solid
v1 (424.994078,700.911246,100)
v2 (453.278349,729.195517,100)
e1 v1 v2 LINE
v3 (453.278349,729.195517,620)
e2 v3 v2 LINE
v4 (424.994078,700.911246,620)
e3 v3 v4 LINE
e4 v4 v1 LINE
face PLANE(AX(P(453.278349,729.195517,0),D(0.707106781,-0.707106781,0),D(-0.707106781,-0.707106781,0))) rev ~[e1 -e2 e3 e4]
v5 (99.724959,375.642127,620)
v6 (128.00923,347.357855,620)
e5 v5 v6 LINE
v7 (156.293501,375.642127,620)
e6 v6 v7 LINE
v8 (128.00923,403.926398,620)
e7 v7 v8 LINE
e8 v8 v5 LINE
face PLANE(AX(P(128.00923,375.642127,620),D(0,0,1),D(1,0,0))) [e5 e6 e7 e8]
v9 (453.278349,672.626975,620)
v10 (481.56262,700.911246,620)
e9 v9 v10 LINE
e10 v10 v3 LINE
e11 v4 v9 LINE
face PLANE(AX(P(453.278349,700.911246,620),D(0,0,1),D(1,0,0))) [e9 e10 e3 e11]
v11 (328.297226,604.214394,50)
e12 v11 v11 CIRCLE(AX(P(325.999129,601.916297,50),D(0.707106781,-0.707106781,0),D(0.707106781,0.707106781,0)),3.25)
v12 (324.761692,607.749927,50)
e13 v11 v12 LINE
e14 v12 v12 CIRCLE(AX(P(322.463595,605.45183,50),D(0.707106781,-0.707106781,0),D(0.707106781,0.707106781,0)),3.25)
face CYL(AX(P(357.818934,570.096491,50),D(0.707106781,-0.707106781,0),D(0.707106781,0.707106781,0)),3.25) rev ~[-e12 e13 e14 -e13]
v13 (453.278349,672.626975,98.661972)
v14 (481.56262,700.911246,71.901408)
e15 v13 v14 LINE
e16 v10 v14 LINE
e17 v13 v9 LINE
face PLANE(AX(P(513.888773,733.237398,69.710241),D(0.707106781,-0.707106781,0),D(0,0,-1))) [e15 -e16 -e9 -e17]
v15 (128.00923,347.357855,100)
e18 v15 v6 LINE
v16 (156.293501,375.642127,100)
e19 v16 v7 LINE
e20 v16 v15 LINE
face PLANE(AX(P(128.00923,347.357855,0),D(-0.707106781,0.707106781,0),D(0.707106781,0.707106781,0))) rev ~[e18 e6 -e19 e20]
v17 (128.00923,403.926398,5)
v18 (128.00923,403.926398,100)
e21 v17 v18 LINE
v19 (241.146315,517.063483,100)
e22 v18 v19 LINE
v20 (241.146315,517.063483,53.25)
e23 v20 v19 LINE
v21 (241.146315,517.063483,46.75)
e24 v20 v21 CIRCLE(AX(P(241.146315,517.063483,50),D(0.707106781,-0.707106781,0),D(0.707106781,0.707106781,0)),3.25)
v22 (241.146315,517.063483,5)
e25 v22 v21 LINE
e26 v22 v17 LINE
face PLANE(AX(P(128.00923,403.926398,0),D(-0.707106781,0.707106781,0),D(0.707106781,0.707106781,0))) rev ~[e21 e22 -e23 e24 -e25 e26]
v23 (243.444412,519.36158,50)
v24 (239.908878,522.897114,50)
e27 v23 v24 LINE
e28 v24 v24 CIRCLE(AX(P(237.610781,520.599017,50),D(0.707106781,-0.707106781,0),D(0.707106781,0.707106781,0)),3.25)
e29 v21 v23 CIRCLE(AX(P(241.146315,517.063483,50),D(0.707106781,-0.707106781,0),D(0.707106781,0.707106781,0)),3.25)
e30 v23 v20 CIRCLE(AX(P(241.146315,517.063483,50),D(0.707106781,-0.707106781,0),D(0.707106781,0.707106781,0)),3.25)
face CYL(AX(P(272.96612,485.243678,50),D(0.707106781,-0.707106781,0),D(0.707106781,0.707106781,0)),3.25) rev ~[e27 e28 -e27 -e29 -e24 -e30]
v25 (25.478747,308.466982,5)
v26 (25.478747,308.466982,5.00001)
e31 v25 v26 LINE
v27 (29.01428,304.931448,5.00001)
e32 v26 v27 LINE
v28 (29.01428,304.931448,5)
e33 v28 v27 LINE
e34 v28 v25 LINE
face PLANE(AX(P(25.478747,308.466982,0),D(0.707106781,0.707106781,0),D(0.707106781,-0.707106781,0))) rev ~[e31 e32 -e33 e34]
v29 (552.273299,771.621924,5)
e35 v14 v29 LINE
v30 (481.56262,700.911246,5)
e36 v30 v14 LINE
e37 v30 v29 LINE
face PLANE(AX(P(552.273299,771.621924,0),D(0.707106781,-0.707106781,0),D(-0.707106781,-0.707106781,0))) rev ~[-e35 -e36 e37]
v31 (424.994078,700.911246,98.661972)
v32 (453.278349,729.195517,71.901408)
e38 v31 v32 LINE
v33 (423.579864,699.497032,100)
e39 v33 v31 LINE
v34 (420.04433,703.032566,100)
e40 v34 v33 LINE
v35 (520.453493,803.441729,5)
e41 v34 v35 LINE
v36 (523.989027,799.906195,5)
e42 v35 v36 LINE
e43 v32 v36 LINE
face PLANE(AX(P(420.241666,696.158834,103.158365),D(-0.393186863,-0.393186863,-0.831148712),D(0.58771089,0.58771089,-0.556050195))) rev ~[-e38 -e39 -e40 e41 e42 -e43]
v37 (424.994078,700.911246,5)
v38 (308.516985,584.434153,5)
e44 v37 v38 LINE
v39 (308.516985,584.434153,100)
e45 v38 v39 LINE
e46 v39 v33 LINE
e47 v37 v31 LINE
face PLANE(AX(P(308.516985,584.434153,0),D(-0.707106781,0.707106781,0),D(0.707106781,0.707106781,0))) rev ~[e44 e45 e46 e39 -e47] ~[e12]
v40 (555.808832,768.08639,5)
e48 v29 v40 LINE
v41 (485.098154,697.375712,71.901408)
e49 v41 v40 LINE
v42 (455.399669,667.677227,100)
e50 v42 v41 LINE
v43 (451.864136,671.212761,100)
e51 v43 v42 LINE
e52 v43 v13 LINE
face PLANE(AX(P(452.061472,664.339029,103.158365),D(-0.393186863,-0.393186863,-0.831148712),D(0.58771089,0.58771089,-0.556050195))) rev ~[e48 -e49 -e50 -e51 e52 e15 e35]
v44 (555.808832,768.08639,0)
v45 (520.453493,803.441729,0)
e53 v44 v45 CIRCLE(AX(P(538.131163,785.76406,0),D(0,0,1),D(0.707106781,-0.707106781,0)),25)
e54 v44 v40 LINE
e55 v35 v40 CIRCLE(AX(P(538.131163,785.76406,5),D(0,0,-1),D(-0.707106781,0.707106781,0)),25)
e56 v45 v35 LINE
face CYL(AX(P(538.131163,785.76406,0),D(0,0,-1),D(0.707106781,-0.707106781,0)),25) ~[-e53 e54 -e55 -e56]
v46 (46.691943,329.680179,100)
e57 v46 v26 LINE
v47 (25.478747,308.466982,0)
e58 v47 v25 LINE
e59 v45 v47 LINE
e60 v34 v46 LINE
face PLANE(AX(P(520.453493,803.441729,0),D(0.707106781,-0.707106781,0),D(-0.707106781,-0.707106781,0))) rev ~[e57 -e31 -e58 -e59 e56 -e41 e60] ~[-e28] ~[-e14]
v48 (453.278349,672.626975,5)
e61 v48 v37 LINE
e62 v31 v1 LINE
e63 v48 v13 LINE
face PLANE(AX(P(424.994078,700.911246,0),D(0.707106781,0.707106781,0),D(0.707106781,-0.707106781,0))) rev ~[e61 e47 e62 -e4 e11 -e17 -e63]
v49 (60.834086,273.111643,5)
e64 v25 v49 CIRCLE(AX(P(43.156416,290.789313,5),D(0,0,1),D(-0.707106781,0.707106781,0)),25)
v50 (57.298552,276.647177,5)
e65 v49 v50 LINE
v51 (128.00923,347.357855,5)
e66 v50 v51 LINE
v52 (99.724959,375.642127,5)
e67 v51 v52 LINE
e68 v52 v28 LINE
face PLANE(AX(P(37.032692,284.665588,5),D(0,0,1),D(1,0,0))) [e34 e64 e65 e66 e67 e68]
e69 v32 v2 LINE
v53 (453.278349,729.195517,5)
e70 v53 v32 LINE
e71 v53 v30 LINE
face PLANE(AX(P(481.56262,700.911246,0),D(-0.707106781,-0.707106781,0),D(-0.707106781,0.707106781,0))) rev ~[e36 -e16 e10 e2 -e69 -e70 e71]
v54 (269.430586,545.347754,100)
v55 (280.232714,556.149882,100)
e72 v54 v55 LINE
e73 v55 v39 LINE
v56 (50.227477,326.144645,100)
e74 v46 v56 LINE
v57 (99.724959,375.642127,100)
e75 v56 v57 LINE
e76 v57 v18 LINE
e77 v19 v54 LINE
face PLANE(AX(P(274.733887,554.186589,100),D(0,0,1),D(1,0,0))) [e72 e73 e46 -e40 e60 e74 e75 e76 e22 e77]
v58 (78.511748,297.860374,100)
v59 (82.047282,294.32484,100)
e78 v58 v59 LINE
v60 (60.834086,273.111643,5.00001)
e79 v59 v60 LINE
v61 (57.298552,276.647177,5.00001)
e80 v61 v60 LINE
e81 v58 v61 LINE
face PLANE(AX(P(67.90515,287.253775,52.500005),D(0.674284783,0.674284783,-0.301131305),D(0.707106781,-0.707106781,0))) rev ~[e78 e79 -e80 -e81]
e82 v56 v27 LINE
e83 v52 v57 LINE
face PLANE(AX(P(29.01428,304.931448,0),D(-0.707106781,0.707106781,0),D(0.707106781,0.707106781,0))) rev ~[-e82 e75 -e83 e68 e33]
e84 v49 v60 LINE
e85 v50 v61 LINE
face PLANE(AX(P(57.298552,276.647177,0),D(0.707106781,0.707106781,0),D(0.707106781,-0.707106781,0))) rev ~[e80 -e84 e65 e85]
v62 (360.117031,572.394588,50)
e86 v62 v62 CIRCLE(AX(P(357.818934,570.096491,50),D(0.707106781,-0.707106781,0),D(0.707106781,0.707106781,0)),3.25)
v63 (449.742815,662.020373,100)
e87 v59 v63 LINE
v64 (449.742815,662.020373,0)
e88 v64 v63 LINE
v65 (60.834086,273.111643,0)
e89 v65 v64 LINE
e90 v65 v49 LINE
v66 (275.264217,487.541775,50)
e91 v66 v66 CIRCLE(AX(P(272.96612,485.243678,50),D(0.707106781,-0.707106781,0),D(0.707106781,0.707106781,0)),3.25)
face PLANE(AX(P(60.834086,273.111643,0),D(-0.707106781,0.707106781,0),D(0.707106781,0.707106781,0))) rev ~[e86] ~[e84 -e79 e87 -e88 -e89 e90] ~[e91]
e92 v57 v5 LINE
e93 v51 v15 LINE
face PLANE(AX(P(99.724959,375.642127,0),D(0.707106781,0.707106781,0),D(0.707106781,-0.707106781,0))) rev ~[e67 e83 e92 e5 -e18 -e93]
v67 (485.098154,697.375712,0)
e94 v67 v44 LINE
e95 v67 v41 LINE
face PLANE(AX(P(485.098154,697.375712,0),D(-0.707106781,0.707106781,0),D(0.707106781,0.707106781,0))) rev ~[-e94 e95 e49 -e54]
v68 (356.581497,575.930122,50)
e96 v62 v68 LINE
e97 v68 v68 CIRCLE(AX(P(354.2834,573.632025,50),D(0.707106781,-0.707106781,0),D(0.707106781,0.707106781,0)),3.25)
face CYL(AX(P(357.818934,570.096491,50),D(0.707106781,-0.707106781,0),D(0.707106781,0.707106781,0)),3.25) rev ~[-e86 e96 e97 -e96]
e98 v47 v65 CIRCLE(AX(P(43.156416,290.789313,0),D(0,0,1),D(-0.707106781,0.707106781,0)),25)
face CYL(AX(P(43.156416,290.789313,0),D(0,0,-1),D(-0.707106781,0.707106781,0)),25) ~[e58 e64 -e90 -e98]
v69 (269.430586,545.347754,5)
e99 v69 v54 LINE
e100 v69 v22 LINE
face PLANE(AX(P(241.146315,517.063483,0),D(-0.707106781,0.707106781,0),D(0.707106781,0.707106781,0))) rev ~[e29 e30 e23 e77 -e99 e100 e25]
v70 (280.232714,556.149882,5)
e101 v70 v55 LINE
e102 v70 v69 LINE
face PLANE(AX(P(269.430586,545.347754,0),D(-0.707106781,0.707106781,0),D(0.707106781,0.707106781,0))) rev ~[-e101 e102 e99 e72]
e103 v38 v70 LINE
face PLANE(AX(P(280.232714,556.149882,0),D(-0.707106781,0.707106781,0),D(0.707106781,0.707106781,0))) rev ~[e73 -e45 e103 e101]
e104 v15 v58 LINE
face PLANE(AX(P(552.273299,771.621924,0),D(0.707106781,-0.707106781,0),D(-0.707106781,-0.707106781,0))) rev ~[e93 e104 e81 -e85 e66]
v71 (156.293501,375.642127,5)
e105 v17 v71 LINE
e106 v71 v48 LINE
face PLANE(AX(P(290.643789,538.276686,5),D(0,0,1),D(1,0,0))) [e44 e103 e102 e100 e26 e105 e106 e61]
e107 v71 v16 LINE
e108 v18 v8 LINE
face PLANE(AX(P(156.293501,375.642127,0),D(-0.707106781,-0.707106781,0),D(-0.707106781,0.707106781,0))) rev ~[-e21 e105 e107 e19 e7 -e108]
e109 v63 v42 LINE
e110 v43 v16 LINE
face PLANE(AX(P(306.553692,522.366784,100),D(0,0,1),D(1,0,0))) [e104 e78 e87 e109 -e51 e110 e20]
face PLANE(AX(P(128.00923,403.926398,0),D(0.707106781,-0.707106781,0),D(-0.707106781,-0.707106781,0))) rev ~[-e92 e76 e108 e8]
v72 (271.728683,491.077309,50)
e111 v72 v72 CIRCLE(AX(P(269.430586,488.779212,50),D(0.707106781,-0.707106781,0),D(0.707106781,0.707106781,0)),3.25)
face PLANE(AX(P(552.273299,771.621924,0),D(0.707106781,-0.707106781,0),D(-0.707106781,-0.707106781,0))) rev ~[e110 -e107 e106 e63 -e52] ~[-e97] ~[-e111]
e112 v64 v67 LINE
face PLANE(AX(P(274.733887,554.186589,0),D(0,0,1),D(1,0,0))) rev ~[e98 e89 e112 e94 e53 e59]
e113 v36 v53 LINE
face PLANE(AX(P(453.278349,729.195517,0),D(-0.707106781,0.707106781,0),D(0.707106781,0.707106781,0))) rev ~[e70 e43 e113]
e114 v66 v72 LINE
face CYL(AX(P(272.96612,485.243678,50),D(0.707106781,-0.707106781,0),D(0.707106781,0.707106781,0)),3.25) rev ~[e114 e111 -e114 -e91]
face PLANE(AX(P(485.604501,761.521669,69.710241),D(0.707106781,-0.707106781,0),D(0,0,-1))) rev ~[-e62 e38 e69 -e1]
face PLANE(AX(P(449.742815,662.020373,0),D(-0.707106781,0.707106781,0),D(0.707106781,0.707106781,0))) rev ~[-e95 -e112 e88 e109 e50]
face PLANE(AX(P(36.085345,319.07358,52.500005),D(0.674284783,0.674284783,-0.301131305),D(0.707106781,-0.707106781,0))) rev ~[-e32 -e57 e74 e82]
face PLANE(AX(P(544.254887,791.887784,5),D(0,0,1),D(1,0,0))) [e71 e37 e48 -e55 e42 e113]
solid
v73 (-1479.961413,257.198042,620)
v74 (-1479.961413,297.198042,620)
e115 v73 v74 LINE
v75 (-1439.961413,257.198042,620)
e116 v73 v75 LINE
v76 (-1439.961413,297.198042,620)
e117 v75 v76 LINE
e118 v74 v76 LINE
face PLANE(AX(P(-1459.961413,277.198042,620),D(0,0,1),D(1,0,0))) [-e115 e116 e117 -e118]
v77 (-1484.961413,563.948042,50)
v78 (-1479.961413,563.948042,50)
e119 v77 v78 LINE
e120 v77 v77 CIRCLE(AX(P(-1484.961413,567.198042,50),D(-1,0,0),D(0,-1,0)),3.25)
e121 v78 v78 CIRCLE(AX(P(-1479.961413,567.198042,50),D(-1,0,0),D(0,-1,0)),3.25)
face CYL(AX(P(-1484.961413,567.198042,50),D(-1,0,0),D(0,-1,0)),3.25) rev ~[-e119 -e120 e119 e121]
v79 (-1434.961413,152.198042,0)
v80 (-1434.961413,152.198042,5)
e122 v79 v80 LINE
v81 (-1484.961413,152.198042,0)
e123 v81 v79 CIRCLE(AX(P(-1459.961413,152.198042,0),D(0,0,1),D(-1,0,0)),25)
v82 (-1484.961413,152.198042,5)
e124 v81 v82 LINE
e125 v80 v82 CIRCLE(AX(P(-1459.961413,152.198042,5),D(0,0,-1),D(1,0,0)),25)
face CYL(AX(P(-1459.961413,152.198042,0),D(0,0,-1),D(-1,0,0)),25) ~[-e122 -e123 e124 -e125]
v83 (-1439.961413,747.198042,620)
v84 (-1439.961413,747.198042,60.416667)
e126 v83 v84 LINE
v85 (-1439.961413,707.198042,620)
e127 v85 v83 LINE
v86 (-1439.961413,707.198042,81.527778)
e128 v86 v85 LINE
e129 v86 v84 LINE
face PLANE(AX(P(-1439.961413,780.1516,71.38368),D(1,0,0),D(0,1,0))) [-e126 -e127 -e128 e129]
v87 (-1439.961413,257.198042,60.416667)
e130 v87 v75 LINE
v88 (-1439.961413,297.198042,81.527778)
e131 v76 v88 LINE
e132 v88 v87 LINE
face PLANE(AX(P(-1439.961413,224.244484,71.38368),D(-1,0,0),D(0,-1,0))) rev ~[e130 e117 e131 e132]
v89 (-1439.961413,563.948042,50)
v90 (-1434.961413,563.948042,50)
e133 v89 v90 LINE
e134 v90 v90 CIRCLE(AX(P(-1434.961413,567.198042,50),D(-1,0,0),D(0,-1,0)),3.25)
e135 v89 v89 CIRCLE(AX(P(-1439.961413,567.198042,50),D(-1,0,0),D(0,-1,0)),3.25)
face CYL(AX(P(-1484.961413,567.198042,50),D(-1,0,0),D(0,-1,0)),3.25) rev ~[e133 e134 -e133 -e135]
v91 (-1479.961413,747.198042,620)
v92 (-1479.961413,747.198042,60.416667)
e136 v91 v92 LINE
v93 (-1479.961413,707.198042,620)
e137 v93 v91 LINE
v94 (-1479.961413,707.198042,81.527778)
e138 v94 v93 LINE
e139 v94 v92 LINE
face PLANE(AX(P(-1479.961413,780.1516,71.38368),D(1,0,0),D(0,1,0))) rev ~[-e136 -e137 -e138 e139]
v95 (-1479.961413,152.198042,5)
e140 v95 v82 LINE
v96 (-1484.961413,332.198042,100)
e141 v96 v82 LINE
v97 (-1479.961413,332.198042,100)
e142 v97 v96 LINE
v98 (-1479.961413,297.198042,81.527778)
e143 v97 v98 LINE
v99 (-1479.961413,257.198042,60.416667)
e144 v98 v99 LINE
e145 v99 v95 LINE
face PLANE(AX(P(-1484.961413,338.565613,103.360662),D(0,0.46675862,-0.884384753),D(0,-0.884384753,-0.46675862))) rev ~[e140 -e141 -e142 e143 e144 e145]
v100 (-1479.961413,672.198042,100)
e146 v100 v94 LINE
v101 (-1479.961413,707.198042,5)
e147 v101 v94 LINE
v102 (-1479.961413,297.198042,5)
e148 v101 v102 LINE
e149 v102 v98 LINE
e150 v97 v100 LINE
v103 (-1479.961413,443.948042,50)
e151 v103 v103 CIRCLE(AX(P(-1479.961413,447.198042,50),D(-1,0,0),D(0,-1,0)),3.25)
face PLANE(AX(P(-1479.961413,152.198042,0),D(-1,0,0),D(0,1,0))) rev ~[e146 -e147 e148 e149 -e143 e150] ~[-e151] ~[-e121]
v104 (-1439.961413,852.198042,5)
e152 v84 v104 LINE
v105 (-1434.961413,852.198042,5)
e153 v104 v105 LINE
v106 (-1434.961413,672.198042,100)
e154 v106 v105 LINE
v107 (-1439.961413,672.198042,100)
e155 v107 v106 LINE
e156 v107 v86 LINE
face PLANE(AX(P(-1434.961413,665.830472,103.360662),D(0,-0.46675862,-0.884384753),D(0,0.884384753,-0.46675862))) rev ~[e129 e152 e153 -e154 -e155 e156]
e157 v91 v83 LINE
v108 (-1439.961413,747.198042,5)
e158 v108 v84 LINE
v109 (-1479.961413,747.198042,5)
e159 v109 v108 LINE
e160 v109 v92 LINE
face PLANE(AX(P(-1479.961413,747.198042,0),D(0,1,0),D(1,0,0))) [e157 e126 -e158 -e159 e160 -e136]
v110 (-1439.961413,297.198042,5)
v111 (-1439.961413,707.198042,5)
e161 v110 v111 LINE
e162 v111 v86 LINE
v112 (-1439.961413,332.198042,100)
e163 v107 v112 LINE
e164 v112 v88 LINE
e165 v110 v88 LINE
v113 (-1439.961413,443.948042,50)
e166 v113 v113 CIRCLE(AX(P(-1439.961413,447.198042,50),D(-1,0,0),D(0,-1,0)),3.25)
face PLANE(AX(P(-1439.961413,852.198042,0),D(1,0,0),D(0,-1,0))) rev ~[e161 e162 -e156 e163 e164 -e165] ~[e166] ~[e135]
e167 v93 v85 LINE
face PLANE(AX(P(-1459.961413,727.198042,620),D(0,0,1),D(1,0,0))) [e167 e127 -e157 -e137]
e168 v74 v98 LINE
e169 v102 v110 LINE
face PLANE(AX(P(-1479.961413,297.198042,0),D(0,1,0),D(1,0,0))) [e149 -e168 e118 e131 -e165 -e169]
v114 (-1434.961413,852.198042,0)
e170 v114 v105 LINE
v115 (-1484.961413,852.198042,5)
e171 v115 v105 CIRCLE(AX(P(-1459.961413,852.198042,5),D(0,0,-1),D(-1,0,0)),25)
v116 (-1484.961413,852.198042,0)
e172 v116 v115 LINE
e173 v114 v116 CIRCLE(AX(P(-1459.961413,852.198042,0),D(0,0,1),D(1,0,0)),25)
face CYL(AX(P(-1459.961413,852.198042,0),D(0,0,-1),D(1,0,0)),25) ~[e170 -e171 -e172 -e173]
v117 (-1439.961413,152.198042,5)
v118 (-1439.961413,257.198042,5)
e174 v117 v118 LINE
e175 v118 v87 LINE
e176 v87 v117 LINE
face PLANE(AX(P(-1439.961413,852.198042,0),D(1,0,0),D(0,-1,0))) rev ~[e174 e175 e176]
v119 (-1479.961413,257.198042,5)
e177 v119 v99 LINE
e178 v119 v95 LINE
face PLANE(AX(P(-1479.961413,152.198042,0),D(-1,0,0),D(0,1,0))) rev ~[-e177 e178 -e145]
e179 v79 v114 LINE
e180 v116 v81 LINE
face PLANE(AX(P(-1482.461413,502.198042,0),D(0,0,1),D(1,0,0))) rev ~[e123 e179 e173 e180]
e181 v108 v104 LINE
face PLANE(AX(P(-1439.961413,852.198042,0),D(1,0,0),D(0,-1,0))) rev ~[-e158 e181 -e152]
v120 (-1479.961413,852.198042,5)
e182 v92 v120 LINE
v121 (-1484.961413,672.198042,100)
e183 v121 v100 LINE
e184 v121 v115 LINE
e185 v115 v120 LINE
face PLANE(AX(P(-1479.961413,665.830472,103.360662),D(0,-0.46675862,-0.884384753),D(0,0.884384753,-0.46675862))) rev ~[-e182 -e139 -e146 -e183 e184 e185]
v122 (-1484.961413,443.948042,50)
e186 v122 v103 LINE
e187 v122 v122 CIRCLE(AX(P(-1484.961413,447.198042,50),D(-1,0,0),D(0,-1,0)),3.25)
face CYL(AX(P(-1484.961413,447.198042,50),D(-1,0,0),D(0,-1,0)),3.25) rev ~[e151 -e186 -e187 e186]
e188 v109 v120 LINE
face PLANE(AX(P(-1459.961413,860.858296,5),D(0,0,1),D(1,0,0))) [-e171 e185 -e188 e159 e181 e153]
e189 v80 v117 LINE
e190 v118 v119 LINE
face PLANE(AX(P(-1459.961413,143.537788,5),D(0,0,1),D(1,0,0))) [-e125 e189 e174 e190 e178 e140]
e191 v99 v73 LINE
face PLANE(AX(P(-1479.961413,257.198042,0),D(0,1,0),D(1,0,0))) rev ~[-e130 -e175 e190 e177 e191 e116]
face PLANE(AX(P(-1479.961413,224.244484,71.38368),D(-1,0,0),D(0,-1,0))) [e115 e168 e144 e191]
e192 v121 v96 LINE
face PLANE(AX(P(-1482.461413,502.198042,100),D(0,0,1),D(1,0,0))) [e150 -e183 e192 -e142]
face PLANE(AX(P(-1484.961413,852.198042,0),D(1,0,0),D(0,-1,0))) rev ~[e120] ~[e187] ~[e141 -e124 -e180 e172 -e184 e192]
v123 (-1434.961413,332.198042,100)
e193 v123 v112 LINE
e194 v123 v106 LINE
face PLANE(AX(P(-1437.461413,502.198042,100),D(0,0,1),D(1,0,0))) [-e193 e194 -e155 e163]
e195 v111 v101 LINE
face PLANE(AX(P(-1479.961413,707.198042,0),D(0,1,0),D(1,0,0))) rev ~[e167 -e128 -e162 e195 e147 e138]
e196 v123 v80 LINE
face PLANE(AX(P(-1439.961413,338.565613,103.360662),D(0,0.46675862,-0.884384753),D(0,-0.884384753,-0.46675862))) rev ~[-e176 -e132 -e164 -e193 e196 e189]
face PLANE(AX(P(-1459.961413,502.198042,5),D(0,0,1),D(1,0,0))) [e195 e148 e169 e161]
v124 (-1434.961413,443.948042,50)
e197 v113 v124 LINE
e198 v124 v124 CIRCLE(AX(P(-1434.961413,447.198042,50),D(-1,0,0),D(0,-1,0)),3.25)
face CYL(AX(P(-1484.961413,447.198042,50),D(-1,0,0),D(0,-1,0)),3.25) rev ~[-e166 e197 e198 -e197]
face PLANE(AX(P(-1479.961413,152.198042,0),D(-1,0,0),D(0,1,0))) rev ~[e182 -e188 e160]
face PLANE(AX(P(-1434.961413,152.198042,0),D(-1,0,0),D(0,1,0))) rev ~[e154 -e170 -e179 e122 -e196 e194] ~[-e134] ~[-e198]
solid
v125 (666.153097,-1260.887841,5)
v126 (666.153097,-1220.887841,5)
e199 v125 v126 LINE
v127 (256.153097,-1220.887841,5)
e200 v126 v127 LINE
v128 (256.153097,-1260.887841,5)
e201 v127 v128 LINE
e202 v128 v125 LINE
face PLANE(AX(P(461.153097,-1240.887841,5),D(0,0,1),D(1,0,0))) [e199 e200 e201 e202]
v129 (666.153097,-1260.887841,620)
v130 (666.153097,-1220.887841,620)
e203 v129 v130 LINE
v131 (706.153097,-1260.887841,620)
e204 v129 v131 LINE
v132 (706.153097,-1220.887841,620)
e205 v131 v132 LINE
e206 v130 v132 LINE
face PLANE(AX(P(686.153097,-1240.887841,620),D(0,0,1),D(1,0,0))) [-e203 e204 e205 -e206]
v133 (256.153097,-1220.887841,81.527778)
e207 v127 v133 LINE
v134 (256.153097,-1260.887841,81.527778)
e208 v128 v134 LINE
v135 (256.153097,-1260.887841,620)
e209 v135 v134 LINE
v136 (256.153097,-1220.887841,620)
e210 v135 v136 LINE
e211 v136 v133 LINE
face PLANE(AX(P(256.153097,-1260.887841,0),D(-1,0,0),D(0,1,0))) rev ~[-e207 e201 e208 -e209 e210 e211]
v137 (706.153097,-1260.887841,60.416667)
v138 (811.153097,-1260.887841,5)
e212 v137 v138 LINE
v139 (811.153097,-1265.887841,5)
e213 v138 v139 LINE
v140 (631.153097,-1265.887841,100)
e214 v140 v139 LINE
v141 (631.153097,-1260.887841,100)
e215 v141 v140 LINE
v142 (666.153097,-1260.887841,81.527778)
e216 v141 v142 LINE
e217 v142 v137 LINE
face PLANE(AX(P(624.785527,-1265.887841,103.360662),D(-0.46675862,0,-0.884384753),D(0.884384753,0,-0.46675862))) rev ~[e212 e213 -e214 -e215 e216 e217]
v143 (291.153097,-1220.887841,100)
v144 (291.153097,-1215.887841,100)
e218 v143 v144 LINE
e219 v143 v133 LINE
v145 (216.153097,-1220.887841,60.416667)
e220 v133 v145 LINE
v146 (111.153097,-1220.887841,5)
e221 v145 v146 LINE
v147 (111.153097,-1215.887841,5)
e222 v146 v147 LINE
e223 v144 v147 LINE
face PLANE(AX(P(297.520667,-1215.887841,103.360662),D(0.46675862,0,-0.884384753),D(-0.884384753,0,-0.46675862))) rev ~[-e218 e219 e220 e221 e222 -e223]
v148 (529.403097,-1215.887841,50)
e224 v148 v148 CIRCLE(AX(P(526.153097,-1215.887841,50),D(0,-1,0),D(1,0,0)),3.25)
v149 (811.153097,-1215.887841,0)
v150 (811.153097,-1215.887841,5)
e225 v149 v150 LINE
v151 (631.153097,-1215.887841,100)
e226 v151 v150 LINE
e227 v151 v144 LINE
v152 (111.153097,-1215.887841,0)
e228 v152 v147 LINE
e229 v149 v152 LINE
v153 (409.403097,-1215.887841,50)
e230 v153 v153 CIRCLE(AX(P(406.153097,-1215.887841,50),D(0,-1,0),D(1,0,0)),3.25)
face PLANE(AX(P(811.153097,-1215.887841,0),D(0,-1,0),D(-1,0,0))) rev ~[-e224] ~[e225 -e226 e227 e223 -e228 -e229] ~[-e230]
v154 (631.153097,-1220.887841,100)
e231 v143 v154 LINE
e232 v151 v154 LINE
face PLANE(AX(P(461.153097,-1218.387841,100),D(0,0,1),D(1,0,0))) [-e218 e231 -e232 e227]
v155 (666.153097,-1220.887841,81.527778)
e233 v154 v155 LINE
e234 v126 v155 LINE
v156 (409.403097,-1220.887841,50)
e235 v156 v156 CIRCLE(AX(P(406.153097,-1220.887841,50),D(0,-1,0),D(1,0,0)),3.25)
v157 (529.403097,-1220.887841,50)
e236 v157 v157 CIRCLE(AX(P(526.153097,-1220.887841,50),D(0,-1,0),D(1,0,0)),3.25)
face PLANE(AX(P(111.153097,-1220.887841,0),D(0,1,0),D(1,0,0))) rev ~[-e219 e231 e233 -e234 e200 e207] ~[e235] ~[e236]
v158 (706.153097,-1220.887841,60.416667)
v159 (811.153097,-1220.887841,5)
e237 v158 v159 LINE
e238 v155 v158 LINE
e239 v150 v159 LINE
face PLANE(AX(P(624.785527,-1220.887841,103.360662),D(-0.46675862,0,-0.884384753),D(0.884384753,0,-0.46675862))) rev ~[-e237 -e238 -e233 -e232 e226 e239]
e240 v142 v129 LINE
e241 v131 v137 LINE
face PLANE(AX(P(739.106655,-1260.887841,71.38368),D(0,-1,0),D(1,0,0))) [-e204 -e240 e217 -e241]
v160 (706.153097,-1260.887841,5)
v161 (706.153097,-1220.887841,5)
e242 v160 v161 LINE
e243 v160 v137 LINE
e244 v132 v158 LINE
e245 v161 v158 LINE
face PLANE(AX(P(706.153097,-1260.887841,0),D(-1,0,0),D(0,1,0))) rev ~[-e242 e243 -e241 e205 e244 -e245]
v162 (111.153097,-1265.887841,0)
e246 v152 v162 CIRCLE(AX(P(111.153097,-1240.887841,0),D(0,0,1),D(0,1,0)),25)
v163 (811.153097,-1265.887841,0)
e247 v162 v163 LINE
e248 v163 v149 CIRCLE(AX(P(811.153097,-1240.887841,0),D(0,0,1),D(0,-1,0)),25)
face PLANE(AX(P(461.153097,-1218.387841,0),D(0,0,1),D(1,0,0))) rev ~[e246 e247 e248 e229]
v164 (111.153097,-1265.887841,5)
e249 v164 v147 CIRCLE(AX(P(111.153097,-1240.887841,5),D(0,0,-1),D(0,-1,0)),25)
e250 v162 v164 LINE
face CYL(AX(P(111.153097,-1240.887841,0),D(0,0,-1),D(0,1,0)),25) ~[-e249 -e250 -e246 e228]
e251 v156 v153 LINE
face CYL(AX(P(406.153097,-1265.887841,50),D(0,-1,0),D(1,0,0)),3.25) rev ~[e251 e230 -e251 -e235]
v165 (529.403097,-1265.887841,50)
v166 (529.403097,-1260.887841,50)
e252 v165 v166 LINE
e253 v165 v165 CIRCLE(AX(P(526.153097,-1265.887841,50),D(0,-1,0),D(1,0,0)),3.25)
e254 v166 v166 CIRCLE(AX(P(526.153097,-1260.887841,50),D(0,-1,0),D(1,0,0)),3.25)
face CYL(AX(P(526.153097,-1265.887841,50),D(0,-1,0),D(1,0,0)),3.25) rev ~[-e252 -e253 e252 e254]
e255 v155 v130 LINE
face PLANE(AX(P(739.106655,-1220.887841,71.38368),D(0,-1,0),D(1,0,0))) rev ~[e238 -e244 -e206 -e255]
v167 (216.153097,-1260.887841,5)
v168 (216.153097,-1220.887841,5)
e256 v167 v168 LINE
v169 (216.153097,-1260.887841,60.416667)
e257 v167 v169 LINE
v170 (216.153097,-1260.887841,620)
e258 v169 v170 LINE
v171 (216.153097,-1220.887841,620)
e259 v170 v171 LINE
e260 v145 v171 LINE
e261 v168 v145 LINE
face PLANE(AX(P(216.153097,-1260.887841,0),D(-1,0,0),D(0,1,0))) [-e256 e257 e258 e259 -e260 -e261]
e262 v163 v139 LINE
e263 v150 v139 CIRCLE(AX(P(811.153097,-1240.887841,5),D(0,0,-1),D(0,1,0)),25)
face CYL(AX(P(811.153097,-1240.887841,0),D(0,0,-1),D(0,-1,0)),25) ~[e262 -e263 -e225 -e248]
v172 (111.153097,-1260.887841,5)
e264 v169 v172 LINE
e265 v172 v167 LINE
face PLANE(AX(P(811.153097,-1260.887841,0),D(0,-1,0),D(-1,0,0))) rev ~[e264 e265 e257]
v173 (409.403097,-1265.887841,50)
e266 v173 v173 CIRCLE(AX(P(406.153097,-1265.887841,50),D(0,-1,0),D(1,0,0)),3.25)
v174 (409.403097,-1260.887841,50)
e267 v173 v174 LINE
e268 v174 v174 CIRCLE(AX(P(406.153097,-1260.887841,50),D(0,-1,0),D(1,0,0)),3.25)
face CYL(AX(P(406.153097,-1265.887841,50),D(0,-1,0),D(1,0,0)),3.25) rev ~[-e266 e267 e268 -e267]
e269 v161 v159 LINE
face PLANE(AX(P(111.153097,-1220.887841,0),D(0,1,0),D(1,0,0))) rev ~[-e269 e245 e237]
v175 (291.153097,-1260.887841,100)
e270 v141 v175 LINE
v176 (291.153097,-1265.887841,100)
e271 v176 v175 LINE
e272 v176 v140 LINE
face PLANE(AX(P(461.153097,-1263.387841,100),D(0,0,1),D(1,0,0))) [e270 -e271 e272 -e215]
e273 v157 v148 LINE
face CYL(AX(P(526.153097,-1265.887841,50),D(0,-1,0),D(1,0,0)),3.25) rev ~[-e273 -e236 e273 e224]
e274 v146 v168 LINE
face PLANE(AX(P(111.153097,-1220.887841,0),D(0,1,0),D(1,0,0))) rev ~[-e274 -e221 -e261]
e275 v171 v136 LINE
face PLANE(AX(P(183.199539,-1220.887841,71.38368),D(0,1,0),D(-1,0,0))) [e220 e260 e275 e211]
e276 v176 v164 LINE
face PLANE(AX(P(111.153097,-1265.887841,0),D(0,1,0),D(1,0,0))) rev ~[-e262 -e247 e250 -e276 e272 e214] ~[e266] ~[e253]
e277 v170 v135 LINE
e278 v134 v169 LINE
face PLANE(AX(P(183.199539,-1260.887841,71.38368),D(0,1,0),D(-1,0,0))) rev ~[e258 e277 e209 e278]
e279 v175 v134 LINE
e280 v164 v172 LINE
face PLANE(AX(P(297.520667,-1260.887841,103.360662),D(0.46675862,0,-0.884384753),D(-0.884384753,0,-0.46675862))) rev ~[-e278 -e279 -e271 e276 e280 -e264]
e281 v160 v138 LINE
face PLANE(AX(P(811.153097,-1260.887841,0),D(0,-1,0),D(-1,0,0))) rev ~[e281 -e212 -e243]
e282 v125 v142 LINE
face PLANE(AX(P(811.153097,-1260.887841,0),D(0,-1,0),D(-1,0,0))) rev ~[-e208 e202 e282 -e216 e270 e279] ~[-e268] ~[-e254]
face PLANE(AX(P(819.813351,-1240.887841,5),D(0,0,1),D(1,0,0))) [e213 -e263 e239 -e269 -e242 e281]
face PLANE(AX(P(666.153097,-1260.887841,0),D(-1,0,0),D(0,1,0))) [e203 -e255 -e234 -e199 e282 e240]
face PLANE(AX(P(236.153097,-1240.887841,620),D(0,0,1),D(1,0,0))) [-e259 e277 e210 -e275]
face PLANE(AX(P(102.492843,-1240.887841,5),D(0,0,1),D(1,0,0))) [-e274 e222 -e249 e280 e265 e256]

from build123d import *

# Parameters (mm, degrees)
F0_W           = 105
F0_H           = 40
F1_DEPTH       = 5
F0_W_2         = 40
F0_H_2         = 105
F2_DEPTH       = 620
F3_DEPTH       = 100
F4_T4_DEPTH    = 5
F4_T9_DEPTH    = 5
F4_T14_DEPTH   = 5
F4_T19_DEPTH   = 5
F4_2_T4_DEPTH  = 5
F4_2_T9_DEPTH  = 5
F4_2_T14_DEPTH = 5
F4_2_T19_DEPTH = 5
F6_T4_DEPTH    = 5
F6_T9_DEPTH    = 5
F7_SIZE2       = 94.99999
F7_SIZE        = 29.99999
F7_2_SIZE2     = 94.99999
F7_2_SIZE      = 29.99999
F10_R          = 3.25
F11_DEPTH      = 60
F12_R          = 3.25
F13_DEPTH      = 60
F14_R          = 3.25
F15_DEPTH      = 60


# Not quite as in the source:
# - a fillet or chamfer that OpenCascade refuses, or shapes differently, is made with other operations: its cross-section is extruded or revolved along the edge and cut away or added
# - two fillets or chamfers of one size are made in one step
# - a fillet or chamfer is up to 0.001 mm smaller than in the source, because OpenCascade refuses the exact size
# - a feature names something its author has since deleted; it is built from what else it names


with BuildPart() as f1:
    # F0 (on Top) → F1 (new body)
    with BuildSketch(Plane.XY):
        with BuildLine():
            ThreePointArc((811.153096903, -1265.8878414162), (836.153096903, -1240.8878414162), (811.153096903, -1215.8878414162))
            Line((811.153096903, -1215.8878414162), (811.153096903, -1220.8878414162))
            Line((811.153096903, -1220.8878414162), (811.153096903, -1260.8878414162))
            Line((811.153096903, -1260.8878414162), (811.153096903, -1265.8878414162))
        make_face()
        with Locations((758.653096903, -1240.8878414162)):
            Rectangle(F0_W, F0_H)
    extrude(amount=F1_DEPTH)



with BuildPart() as f1b:
    # F0 (on Top) → F1, piece 2 (new body)
    with BuildSketch(Plane.XY):
        with BuildLine():
            Line((111.153096903, -1220.8878414162), (111.153096903, -1215.8878414162))
            ThreePointArc((111.153096903, -1215.8878414162), (86.153096903, -1240.8878414162), (111.153096903, -1265.8878414162))
            Line((111.153096903, -1265.8878414162), (111.153096903, -1260.8878414162))
            Line((111.153096903, -1260.8878414162), (111.153096903, -1220.8878414162))
        make_face()
        with Locations((163.653096903, -1240.8878414162)):
            Rectangle(F0_W, F0_H)
    extrude(amount=F1_DEPTH)


with BuildPart() as f1c:
    # F0 (on Top) → F1, piece 3 (new body)
    with BuildSketch(Plane.XY):
        with BuildLine():
            Line((29.0142804433, 304.9314484107), (25.4787465374, 308.4669823167))
            ThreePointArc((25.4787465374, 308.4669823167), (25.4787465374, 273.1116432573), (60.8340855967, 273.1116432573))
            Line((60.8340855967, 273.1116432573), (57.2985516908, 276.6471771633))
            Line((57.2985516908, 276.6471771633), (29.0142804433, 304.9314484107))
        make_face()
        Polygon((99.724958562, 375.6421265294), (29.0142804433, 304.9314484107), (57.2985516908, 276.6471771633), (128.0092298094, 347.3578552819), align=None)
    extrude(amount=F1_DEPTH)



with BuildPart() as f1d:
    # F0 (on Top) → F1, piece 4 (new body)
    with BuildSketch(Plane.XY):
        with BuildLine():
            ThreePointArc((555.8088324273, 768.0863900879), (555.8088324273, 803.4417291473), (520.453493368, 803.4417291473))
            Line((520.453493368, 803.4417291473), (523.9890272739, 799.9061952413))
            Line((523.9890272739, 799.9061952413), (552.2732985214, 771.6219239939))
            Line((552.2732985214, 771.6219239939), (555.8088324273, 768.0863900879))
        make_face()
        Polygon((552.2732985214, 771.6219239939), (523.9890272739, 799.9061952413), (453.2783491552, 729.1955171227), (481.5626204027, 700.9112458752), align=None)
    extrude(amount=F1_DEPTH)


with BuildPart() as f1e:
    # F0 (on Top) → F1, piece 5 (new body)
    with BuildSketch(Plane.XY):
        with BuildLine():
            Line((-1479.9614127988, 152.1980424396), (-1484.9614127988, 152.1980424396))
            ThreePointArc((-1484.9614127988, 152.1980424396), (-1459.9614127988, 127.1980424396), (-1434.9614127988, 152.1980424396))
            Line((-1434.9614127988, 152.1980424396), (-1439.9614127988, 152.1980424396))
            Line((-1439.9614127988, 152.1980424396), (-1479.9614127988, 152.1980424396))
        make_face()
        Polygon((-1479.9614127988, 202.1980424396), (-1479.9614127988, 152.1980424396), (-1439.9614127988, 152.1980424396), (-1439.9614127988, 202.1980424396), (-1439.9614127988, 242.1980424396), (-1439.9614127988, 257.1980424396), (-1479.9614127988, 257.1980424396), (-1479.9614127988, 242.1980424396), align=None)
    extrude(amount=F1_DEPTH)



with BuildPart() as f1f:
    # F0 (on Top) → F1, piece 6 (new body)
    with BuildSketch(Plane.XY):
        with BuildLine():
            ThreePointArc((-1434.9614127988, 852.1980424396), (-1459.9614127988, 877.1980424396), (-1484.9614127988, 852.1980424396))
            Line((-1484.9614127988, 852.1980424396), (-1479.9614127988, 852.1980424396))
            Line((-1479.9614127988, 852.1980424396), (-1439.9614127988, 852.1980424396))
            Line((-1439.9614127988, 852.1980424396), (-1434.9614127988, 852.1980424396))
        make_face()
        with Locations((-1459.9614127988, 799.6980424396)):
            Rectangle(F0_W_2, F0_H_2)
    extrude(amount=F1_DEPTH)


with BuildPart() as f1g:
    # F0 (on Top) → F1, piece 7 (new body)
    with BuildSketch(Plane.XY):
        Polygon((331.153096903, -1220.8878414162), (256.153096903, -1220.8878414162), (256.153096903, -1260.8878414162), (331.153096903, -1260.8878414162), (421.153096903, -1260.8878414162), (511.153096903, -1260.8878414162), (591.153096903, -1260.8878414162), (666.153096903, -1260.8878414162), (666.153096903, -1220.8878414162), (591.153096903, -1220.8878414162), (511.153096903, -1220.8878414162), (421.153096903, -1220.8878414162), align=None)
    extrude(amount=F1_DEPTH)


with BuildPart() as f1h:
    # F0 (on Top) → F1, piece 8 (new body)
    with BuildSketch(Plane.XY):
        Polygon((-1439.9614127988, 707.1980424396), (-1479.9614127988, 707.1980424396), (-1479.9614127988, 542.1980424396), (-1479.9614127988, 502.1980424396), (-1479.9614127988, 297.1980424396), (-1439.9614127988, 297.1980424396), (-1439.9614127988, 502.1980424396), (-1439.9614127988, 542.1980424396), align=None)
    extrude(amount=F1_DEPTH)


with BuildPart() as f1i:
    # F0 (on Top) → F1, piece 9 (new body)
    with BuildSketch(Plane.XY):
        Polygon((241.1463147993, 517.0634827667), (128.0092298094, 403.9263977769), (156.2935010569, 375.6421265294), (269.4305860467, 488.7792115192), (297.7148572942, 517.0634827667), (304.7859251061, 524.1345505786), (333.0701963535, 552.418821826), (453.2783491552, 672.6269746277), (424.9940779078, 700.9112458752), (308.516985229, 584.4341531964), (280.2327139815, 556.149881949), (269.4305860467, 545.3477540142), align=None)
    extrude(amount=F1_DEPTH)


with BuildPart() as f1c_1:
    add(f1c.part)

    add(f1d.part)  # F2 merges F1d

    add(f1i.part)  # F2 merges F1i
    # F0 (on Top) → F2 (join)
    with BuildSketch(Plane.XY):
        Polygon((128.0092298094, 403.9263977769), (99.724958562, 375.6421265294), (128.0092298094, 347.3578552819), (156.2935010569, 375.6421265294), align=None)
        Polygon((481.5626204027, 700.9112458752), (453.2783491552, 729.1955171227), (424.9940779078, 700.9112458752), (453.2783491552, 672.6269746277), align=None)
    extrude(amount=F2_DEPTH)

    # F0 (on Top) → F3, piece 2 (join)
    with BuildSketch(Plane.XY):
        Polygon((392.9787465374, 675.9669823167), (43.156416067, 326.1446518463), (25.4787465374, 308.4669823167), (29.0142804433, 304.9314484107), (99.724958562, 375.6421265294), (128.0092298094, 403.9263977769), (241.1463147993, 517.0634827667), (269.4305860467, 545.3477540142), (280.2327139815, 556.149881949), (308.516985229, 584.4341531964), (424.9940779078, 700.9112458752), (453.2783491552, 729.1955171227), (523.9890272739, 799.9061952413), (520.453493368, 803.4417291473), (446.0117551264, 728.9999909057), (414.38747619, 697.3757119693), align=None)
        Polygon((57.2985516908, 276.6471771633), (60.8340855967, 273.1116432573), (78.5117551264, 290.789312787), (428.3340855967, 640.6116432573), (449.7428152493, 662.0203729099), (485.0981543086, 697.3757119693), (555.8088324273, 768.0863900879), (552.2732985214, 771.6219239939), (481.5626204027, 700.9112458752), (453.2783491552, 672.6269746277), (333.0701963535, 552.418821826), (304.7859251061, 524.1345505786), (297.7148572942, 517.0634827667), (269.4305860467, 488.7792115192), (156.2935010569, 375.6421265294), (128.0092298094, 347.3578552819), align=None)
    extrude(amount=F3_DEPTH)

    # F6: chamfer of 142 x 95 on 2 edges, made by hand


with BuildPart() as f1_1:
    add(f1.part)

    add(f1b.part)  # F2#2 merges F1b

    add(f1g.part)  # F2#2 merges F1g
    # F0 (on Top) → F2, piece 2 (join)
    with BuildSketch(Plane.XY):
        with Locations((686.153096903, -1240.8878414162)):
            Rectangle(F0_W_2, F0_H)
        with Locations((236.153096903, -1240.8878414162)):
            Rectangle(F0_W_2, F0_H)
    extrude(amount=F2_DEPTH)

    # F0 (on Top) → F3, piece 3 (join)
    with BuildSketch(Plane.XY):
        Polygon((811.153096903, -1215.8878414162), (111.153096903, -1215.8878414162), (111.153096903, -1220.8878414162), (216.153096903, -1220.8878414162), (256.153096903, -1220.8878414162), (331.153096903, -1220.8878414162), (421.153096903, -1220.8878414162), (511.153096903, -1220.8878414162), (591.153096903, -1220.8878414162), (666.153096903, -1220.8878414162), (706.153096903, -1220.8878414162), (811.153096903, -1220.8878414162), align=None)
        Polygon((111.153096903, -1260.8878414162), (111.153096903, -1265.8878414162), (811.153096903, -1265.8878414162), (811.153096903, -1260.8878414162), (706.153096903, -1260.8878414162), (666.153096903, -1260.8878414162), (591.153096903, -1260.8878414162), (511.153096903, -1260.8878414162), (421.153096903, -1260.8878414162), (331.153096903, -1260.8878414162), (256.153096903, -1260.8878414162), (216.153096903, -1260.8878414162), align=None)
    extrude(amount=F3_DEPTH)

    # F4: chamfer of 180 x 95 on 4 edges, made by hand


with BuildPart() as f1e_1:
    add(f1e.part)

    add(f1f.part)  # F2#3 merges F1f

    add(f1h.part)  # F2#3 merges F1h
    # F0 (on Top) → F2, piece 3 (join)
    with BuildSketch(Plane.XY):
        with Locations((-1459.9614127988, 727.1980424396)):
            Rectangle(F0_W_2, F0_H)
        with Locations((-1459.9614127988, 277.1980424396)):
            Rectangle(F0_W_2, F0_H)
    extrude(amount=F2_DEPTH)

    # F0 (on Top) → F3 (join)
    with BuildSketch(Plane.XY):
        Polygon((-1484.9614127988, 852.1980424396), (-1484.9614127988, 152.1980424396), (-1479.9614127988, 152.1980424396), (-1479.9614127988, 202.1980424396), (-1479.9614127988, 242.1980424396), (-1479.9614127988, 257.1980424396), (-1479.9614127988, 297.1980424396), (-1479.9614127988, 502.1980424396), (-1479.9614127988, 542.1980424396), (-1479.9614127988, 707.1980424396), (-1479.9614127988, 747.1980424396), (-1479.9614127988, 852.1980424396), align=None)
        Polygon((-1439.9614127988, 152.1980424396), (-1434.9614127988, 152.1980424396), (-1434.9614127988, 852.1980424396), (-1439.9614127988, 852.1980424396), (-1439.9614127988, 747.1980424396), (-1439.9614127988, 707.1980424396), (-1439.9614127988, 542.1980424396), (-1439.9614127988, 502.1980424396), (-1439.9614127988, 297.1980424396), (-1439.9614127988, 257.1980424396), (-1439.9614127988, 242.1980424396), (-1439.9614127988, 202.1980424396), align=None)
    extrude(amount=F3_DEPTH)

    # F4#2: chamfer of 180 x 95 on 4 edges, made by hand


with BuildPart() as f4_tool2:
    # F4_s3 → F4_t4 (new body)
    with BuildSketch(Plane.XZ.offset(1260.8878414162)):
        with BuildLine():
            Line((297.5206671235, 103.3606620608), (104.7855266825, 1.6393379392))
            Line((104.7855266825, 1.6393379392), (101.1855266825, 1.6393379392))
            ThreePointArc((101.1855266825, 1.6393379392), (107.553096903, 50.8196689696), (107.553096903, 100))
            Line((107.553096903, 100), (111.153096903, 103.6))
            ThreePointArc((111.153096903, 103.6), (204.3368820132, 103.6), (297.5206671235, 106.9606620608))
            Line((297.5206671235, 106.9606620608), (297.5206671235, 103.3606620608))
        make_face()
    extrude(amount=F4_T4_DEPTH)

    split(bisect_by=Plane.XY.offset(5), keep=Keep.TOP)


with BuildPart() as f1_2:
    add(f1_1.part)

    # F4_t1: cut F4_tool2
    add(f4_tool2.part, mode=Mode.SUBTRACT)


with BuildPart() as f4_tool7:
    # F4_s8 → F4_t9 (new body)
    with BuildSketch(Plane.XZ.offset(1215.8878414162)):
        with BuildLine():
            Line((297.5206671235, 103.3606620608), (104.7855266825, 1.6393379392))
            Line((104.7855266825, 1.6393379392), (101.1855266825, 1.6393379392))
            ThreePointArc((101.1855266825, 1.6393379392), (107.553096903, 50.8196689696), (107.553096903, 100))
            Line((107.553096903, 100), (111.153096903, 103.6))
            ThreePointArc((111.153096903, 103.6), (204.3368820132, 103.6), (297.5206671235, 106.9606620608))
            Line((297.5206671235, 106.9606620608), (297.5206671235, 103.3606620608))
        make_face()
    extrude(amount=F4_T9_DEPTH)

    split(bisect_by=Plane.XY.offset(5), keep=Keep.TOP)


with BuildPart() as f1_3:
    add(f1_2.part)

    # F4_t6: cut F4_tool7
    add(f4_tool7.part, mode=Mode.SUBTRACT)


with BuildPart() as f4_tool12:
    # F4_s13 → F4_t14 (new body)
    with BuildSketch(Plane.XZ.offset(1265.8878414162)):
        with BuildLine():
            Line((624.7855266825, 103.3606620608), (817.5206671235, 1.6393379392))
            Line((817.5206671235, 1.6393379392), (821.1206671235, 1.6393379392))
            ThreePointArc((821.1206671235, 1.6393379392), (814.753096903, 50.8196689696), (814.753096903, 100))
            Line((814.753096903, 100), (811.153096903, 103.6))
            ThreePointArc((811.153096903, 103.6), (717.9693117927, 103.6), (624.7855266825, 106.9606620608))
            Line((624.7855266825, 106.9606620608), (624.7855266825, 103.3606620608))
        make_face()
    extrude(amount=-F4_T14_DEPTH)

    split(bisect_by=Plane.XY.offset(5), keep=Keep.TOP)


with BuildPart() as f1_4:
    add(f1_3.part)

    # F4_t11: cut F4_tool12
    add(f4_tool12.part, mode=Mode.SUBTRACT)


with BuildPart() as f4_tool17:
    # F4_s18 → F4_t19 (new body)
    with BuildSketch(Plane.XZ.offset(1220.8878414162)):
        with BuildLine():
            Line((624.7855266825, 103.3606620608), (817.5206671235, 1.6393379392))
            Line((817.5206671235, 1.6393379392), (821.1206671235, 1.6393379392))
            ThreePointArc((821.1206671235, 1.6393379392), (814.753096903, 50.8196689696), (814.753096903, 100))
            Line((814.753096903, 100), (811.153096903, 103.6))
            ThreePointArc((811.153096903, 103.6), (717.9693117927, 103.6), (624.7855266825, 106.9606620608))
            Line((624.7855266825, 106.9606620608), (624.7855266825, 103.3606620608))
        make_face()
    extrude(amount=-F4_T19_DEPTH)

    split(bisect_by=Plane.XY.offset(5), keep=Keep.TOP)


with BuildPart() as f1_5:
    add(f1_4.part)

    # F4_t16: cut F4_tool17
    add(f4_tool17.part, mode=Mode.SUBTRACT)

    # F9: union 

    # F10 (on face) → F11 (cut)
    with BuildSketch(Plane.XZ.offset(1265.8878414162)):
        with Locations((406.153096903, 50)):
            Circle(F10_R)
        with Locations((526.153096903, 50)):
            Circle(F10_R)
    extrude(amount=-F11_DEPTH, mode=Mode.SUBTRACT)


with BuildPart() as f4_2_tool2:
    # F4_2_s3 → F4_2_t4 (new body)
    with BuildSketch(Plane.YZ.offset(-1484.9614127988)):
        with BuildLine():
            Line((338.5656126601, 103.3606620608), (145.8304722191, 1.6393379392))
            Line((145.8304722191, 1.6393379392), (142.2304722191, 1.6393379392))
            ThreePointArc((142.2304722191, 1.6393379392), (148.5980424396, 50.8196689696), (148.5980424396, 100))
            Line((148.5980424396, 100), (152.1980424396, 103.6))
            ThreePointArc((152.1980424396, 103.6), (245.3818275499, 103.6), (338.5656126601, 106.9606620608))
            Line((338.5656126601, 106.9606620608), (338.5656126601, 103.3606620608))
        make_face()
    extrude(amount=F4_2_T4_DEPTH)

    split(bisect_by=Plane.XY.offset(5), keep=Keep.TOP)


with BuildPart() as f1e_2:
    add(f1e_1.part)

    # F4_2_t1: cut F4_2_tool2
    add(f4_2_tool2.part, mode=Mode.SUBTRACT)


with BuildPart() as f4_2_tool7:
    # F4_2_s8 → F4_2_t9 (new body)
    with BuildSketch(Plane.YZ.offset(-1479.9614127988)):
        with BuildLine():
            Line((665.8304722191, 103.3606620608), (858.5656126601, 1.6393379392))
            Line((858.5656126601, 1.6393379392), (862.1656126601, 1.6393379392))
            ThreePointArc((862.1656126601, 1.6393379392), (855.7980424396, 50.8196689696), (855.7980424396, 100))
            Line((855.7980424396, 100), (852.1980424396, 103.6))
            ThreePointArc((852.1980424396, 103.6), (759.0142573294, 103.6), (665.8304722191, 106.9606620608))
            Line((665.8304722191, 106.9606620608), (665.8304722191, 103.3606620608))
        make_face()
    extrude(amount=-F4_2_T9_DEPTH)

    split(bisect_by=Plane.XY.offset(5), keep=Keep.TOP)


with BuildPart() as f1e_3:
    add(f1e_2.part)

    # F4_2_t6: cut F4_2_tool7
    add(f4_2_tool7.part, mode=Mode.SUBTRACT)


with BuildPart() as f4_2_tool12:
    # F4_2_s13 → F4_2_t14 (new body)
    with BuildSketch(Plane.YZ.offset(-1439.9614127988)):
        with BuildLine():
            Line((338.5656126601, 103.3606620608), (145.8304722191, 1.6393379392))
            Line((145.8304722191, 1.6393379392), (142.2304722191, 1.6393379392))
            ThreePointArc((142.2304722191, 1.6393379392), (148.5980424396, 50.8196689696), (148.5980424396, 100))
            Line((148.5980424396, 100), (152.1980424396, 103.6))
            ThreePointArc((152.1980424396, 103.6), (245.3818275499, 103.6), (338.5656126601, 106.9606620608))
            Line((338.5656126601, 106.9606620608), (338.5656126601, 103.3606620608))
        make_face()
    extrude(amount=F4_2_T14_DEPTH)

    split(bisect_by=Plane.XY.offset(5), keep=Keep.TOP)


with BuildPart() as f1e_4:
    add(f1e_3.part)

    # F4_2_t11: cut F4_2_tool12
    add(f4_2_tool12.part, mode=Mode.SUBTRACT)


with BuildPart() as f4_2_tool17:
    # F4_2_s18 → F4_2_t19 (new body)
    with BuildSketch(Plane.YZ.offset(-1434.9614127988)):
        with BuildLine():
            Line((665.8304722191, 103.3606620608), (858.5656126601, 1.6393379392))
            Line((858.5656126601, 1.6393379392), (862.1656126601, 1.6393379392))
            ThreePointArc((862.1656126601, 1.6393379392), (855.7980424396, 50.8196689696), (855.7980424396, 100))
            Line((855.7980424396, 100), (852.1980424396, 103.6))
            ThreePointArc((852.1980424396, 103.6), (759.0142573294, 103.6), (665.8304722191, 106.9606620608))
            Line((665.8304722191, 106.9606620608), (665.8304722191, 103.3606620608))
        make_face()
    extrude(amount=-F4_2_T19_DEPTH)

    split(bisect_by=Plane.XY.offset(5), keep=Keep.TOP)


with BuildPart() as f1e_5:
    add(f1e_4.part)

    # F4_2_t16: cut F4_2_tool17
    add(f4_2_tool17.part, mode=Mode.SUBTRACT)

    # F8: union 

    # F14 (on face) → F15 (cut)
    with BuildSketch(Plane(origin=(-1484.9614127988, 0, 0), x_dir=(0, -1, 0), z_dir=(-1, 0, 0))):
        with Locations((-567.1980424396, 50)):
            Circle(F14_R)
        with Locations((-447.1980424396, 50)):
            Circle(F14_R)
    extrude(amount=-F15_DEPTH, mode=Mode.SUBTRACT)


with BuildPart() as f6_tool2:
    # F6_s3 → F6_t4 (new body)
    with BuildSketch(Plane(origin=(-106.1387788303, 106.1387788303, 0), x_dir=(0, 0, 1), z_dir=(-0.7071067812, 0.7071067812, 0))):
        with BuildLine():
            Line((103.1583651049, 789.4143647378), (1.8416348951, 940.8562141041))
            Line((1.8416348951, 940.8562141041), (1.8416348951, 943.6962141041))
            ThreePointArc((1.8416348951, 943.6962141041), (50.9208174475, 938.975289421), (100, 938.975289421))
            Line((100, 938.975289421), (102.84, 936.135289421))
            ThreePointArc((102.84, 936.135289421), (102.84, 862.7748270794), (105.9983651049, 789.4143647378))
            Line((105.9983651049, 789.4143647378), (103.1583651049, 789.4143647378))
        make_face()
    extrude(amount=F6_T4_DEPTH)

    split(bisect_by=Plane.XY.offset(5), keep=Keep.TOP)


with BuildPart() as f1c_2:
    add(f1c_1.part)

    # F6_t1: cut F6_tool2
    add(f6_tool2.part, mode=Mode.SUBTRACT)


with BuildPart() as f6_tool7:
    # F6_s8 → F6_t9 (new body)
    with BuildSketch(Plane(origin=(-137.9585839837, 137.9585839837, 0), x_dir=(0, 0, 1), z_dir=(-0.7071067812, 0.7071067812, 0))):
        with BuildLine():
            Line((103.1583651049, 789.4143647378), (1.8416348951, 940.8562141041))
            Line((1.8416348951, 940.8562141041), (1.8416348951, 943.6962141041))
            ThreePointArc((1.8416348951, 943.6962141041), (50.9208174475, 938.975289421), (100, 938.975289421))
            Line((100, 938.975289421), (102.84, 936.135289421))
            ThreePointArc((102.84, 936.135289421), (102.84, 862.7748270794), (105.9983651049, 789.4143647378))
            Line((105.9983651049, 789.4143647378), (103.1583651049, 789.4143647378))
        make_face()
    extrude(amount=F6_T9_DEPTH)

    split(bisect_by=Plane.XY.offset(5), keep=Keep.TOP)


with BuildPart() as f1c_3:
    add(f1c_2.part)

    # F6_t6: cut F6_tool7
    add(f6_tool7.part, mode=Mode.SUBTRACT)

    # F7 (size 30 and 95 in the source; OpenCascade refuses exactly that, so slightly less here)
    f7_edges = [f1c_3.edges().sort_by_distance(p)[0] for p in [
        (59.066319, 274.87941, 100),
    ]]
    f7_side = f1c_3.faces().sort_by_distance((256.349111, 472.162202, 100))[0]
    chamfer(f7_edges, length=F7_SIZE, length2=F7_SIZE2, reference=f7_side)

    # F7#2 (size 30 and 95 in the source; OpenCascade refuses exactly that, so slightly less here)
    f7_2_edges = [f1c_3.edges().sort_by_distance(p)[0] for p in [
        (27.246513, 306.699215, 100),
    ]]
    f7_2_side = f1c_3.faces().sort_by_distance((224.529305, 503.982007, 100))[0]
    chamfer(f7_2_edges, length=F7_2_SIZE, length2=F7_2_SIZE2, reference=f7_2_side)

    # F12 (on face) → F13 (cut)
    with BuildSketch(Plane(origin=(-106.1387788303, 106.1387788303, 0), x_dir=(0.7071067812, 0.7071067812, 0), z_dir=(0.7071067812, -0.7071067812, 0))):
        with Locations((536.135289421, 50)):
            Circle(F12_R)
        with Locations((656.135289421, 50)):
            Circle(F12_R)
    extrude(amount=-F13_DEPTH, mode=Mode.SUBTRACT)


solid = Compound([f1_5.part, f1e_5.part, f1c_3.part])
